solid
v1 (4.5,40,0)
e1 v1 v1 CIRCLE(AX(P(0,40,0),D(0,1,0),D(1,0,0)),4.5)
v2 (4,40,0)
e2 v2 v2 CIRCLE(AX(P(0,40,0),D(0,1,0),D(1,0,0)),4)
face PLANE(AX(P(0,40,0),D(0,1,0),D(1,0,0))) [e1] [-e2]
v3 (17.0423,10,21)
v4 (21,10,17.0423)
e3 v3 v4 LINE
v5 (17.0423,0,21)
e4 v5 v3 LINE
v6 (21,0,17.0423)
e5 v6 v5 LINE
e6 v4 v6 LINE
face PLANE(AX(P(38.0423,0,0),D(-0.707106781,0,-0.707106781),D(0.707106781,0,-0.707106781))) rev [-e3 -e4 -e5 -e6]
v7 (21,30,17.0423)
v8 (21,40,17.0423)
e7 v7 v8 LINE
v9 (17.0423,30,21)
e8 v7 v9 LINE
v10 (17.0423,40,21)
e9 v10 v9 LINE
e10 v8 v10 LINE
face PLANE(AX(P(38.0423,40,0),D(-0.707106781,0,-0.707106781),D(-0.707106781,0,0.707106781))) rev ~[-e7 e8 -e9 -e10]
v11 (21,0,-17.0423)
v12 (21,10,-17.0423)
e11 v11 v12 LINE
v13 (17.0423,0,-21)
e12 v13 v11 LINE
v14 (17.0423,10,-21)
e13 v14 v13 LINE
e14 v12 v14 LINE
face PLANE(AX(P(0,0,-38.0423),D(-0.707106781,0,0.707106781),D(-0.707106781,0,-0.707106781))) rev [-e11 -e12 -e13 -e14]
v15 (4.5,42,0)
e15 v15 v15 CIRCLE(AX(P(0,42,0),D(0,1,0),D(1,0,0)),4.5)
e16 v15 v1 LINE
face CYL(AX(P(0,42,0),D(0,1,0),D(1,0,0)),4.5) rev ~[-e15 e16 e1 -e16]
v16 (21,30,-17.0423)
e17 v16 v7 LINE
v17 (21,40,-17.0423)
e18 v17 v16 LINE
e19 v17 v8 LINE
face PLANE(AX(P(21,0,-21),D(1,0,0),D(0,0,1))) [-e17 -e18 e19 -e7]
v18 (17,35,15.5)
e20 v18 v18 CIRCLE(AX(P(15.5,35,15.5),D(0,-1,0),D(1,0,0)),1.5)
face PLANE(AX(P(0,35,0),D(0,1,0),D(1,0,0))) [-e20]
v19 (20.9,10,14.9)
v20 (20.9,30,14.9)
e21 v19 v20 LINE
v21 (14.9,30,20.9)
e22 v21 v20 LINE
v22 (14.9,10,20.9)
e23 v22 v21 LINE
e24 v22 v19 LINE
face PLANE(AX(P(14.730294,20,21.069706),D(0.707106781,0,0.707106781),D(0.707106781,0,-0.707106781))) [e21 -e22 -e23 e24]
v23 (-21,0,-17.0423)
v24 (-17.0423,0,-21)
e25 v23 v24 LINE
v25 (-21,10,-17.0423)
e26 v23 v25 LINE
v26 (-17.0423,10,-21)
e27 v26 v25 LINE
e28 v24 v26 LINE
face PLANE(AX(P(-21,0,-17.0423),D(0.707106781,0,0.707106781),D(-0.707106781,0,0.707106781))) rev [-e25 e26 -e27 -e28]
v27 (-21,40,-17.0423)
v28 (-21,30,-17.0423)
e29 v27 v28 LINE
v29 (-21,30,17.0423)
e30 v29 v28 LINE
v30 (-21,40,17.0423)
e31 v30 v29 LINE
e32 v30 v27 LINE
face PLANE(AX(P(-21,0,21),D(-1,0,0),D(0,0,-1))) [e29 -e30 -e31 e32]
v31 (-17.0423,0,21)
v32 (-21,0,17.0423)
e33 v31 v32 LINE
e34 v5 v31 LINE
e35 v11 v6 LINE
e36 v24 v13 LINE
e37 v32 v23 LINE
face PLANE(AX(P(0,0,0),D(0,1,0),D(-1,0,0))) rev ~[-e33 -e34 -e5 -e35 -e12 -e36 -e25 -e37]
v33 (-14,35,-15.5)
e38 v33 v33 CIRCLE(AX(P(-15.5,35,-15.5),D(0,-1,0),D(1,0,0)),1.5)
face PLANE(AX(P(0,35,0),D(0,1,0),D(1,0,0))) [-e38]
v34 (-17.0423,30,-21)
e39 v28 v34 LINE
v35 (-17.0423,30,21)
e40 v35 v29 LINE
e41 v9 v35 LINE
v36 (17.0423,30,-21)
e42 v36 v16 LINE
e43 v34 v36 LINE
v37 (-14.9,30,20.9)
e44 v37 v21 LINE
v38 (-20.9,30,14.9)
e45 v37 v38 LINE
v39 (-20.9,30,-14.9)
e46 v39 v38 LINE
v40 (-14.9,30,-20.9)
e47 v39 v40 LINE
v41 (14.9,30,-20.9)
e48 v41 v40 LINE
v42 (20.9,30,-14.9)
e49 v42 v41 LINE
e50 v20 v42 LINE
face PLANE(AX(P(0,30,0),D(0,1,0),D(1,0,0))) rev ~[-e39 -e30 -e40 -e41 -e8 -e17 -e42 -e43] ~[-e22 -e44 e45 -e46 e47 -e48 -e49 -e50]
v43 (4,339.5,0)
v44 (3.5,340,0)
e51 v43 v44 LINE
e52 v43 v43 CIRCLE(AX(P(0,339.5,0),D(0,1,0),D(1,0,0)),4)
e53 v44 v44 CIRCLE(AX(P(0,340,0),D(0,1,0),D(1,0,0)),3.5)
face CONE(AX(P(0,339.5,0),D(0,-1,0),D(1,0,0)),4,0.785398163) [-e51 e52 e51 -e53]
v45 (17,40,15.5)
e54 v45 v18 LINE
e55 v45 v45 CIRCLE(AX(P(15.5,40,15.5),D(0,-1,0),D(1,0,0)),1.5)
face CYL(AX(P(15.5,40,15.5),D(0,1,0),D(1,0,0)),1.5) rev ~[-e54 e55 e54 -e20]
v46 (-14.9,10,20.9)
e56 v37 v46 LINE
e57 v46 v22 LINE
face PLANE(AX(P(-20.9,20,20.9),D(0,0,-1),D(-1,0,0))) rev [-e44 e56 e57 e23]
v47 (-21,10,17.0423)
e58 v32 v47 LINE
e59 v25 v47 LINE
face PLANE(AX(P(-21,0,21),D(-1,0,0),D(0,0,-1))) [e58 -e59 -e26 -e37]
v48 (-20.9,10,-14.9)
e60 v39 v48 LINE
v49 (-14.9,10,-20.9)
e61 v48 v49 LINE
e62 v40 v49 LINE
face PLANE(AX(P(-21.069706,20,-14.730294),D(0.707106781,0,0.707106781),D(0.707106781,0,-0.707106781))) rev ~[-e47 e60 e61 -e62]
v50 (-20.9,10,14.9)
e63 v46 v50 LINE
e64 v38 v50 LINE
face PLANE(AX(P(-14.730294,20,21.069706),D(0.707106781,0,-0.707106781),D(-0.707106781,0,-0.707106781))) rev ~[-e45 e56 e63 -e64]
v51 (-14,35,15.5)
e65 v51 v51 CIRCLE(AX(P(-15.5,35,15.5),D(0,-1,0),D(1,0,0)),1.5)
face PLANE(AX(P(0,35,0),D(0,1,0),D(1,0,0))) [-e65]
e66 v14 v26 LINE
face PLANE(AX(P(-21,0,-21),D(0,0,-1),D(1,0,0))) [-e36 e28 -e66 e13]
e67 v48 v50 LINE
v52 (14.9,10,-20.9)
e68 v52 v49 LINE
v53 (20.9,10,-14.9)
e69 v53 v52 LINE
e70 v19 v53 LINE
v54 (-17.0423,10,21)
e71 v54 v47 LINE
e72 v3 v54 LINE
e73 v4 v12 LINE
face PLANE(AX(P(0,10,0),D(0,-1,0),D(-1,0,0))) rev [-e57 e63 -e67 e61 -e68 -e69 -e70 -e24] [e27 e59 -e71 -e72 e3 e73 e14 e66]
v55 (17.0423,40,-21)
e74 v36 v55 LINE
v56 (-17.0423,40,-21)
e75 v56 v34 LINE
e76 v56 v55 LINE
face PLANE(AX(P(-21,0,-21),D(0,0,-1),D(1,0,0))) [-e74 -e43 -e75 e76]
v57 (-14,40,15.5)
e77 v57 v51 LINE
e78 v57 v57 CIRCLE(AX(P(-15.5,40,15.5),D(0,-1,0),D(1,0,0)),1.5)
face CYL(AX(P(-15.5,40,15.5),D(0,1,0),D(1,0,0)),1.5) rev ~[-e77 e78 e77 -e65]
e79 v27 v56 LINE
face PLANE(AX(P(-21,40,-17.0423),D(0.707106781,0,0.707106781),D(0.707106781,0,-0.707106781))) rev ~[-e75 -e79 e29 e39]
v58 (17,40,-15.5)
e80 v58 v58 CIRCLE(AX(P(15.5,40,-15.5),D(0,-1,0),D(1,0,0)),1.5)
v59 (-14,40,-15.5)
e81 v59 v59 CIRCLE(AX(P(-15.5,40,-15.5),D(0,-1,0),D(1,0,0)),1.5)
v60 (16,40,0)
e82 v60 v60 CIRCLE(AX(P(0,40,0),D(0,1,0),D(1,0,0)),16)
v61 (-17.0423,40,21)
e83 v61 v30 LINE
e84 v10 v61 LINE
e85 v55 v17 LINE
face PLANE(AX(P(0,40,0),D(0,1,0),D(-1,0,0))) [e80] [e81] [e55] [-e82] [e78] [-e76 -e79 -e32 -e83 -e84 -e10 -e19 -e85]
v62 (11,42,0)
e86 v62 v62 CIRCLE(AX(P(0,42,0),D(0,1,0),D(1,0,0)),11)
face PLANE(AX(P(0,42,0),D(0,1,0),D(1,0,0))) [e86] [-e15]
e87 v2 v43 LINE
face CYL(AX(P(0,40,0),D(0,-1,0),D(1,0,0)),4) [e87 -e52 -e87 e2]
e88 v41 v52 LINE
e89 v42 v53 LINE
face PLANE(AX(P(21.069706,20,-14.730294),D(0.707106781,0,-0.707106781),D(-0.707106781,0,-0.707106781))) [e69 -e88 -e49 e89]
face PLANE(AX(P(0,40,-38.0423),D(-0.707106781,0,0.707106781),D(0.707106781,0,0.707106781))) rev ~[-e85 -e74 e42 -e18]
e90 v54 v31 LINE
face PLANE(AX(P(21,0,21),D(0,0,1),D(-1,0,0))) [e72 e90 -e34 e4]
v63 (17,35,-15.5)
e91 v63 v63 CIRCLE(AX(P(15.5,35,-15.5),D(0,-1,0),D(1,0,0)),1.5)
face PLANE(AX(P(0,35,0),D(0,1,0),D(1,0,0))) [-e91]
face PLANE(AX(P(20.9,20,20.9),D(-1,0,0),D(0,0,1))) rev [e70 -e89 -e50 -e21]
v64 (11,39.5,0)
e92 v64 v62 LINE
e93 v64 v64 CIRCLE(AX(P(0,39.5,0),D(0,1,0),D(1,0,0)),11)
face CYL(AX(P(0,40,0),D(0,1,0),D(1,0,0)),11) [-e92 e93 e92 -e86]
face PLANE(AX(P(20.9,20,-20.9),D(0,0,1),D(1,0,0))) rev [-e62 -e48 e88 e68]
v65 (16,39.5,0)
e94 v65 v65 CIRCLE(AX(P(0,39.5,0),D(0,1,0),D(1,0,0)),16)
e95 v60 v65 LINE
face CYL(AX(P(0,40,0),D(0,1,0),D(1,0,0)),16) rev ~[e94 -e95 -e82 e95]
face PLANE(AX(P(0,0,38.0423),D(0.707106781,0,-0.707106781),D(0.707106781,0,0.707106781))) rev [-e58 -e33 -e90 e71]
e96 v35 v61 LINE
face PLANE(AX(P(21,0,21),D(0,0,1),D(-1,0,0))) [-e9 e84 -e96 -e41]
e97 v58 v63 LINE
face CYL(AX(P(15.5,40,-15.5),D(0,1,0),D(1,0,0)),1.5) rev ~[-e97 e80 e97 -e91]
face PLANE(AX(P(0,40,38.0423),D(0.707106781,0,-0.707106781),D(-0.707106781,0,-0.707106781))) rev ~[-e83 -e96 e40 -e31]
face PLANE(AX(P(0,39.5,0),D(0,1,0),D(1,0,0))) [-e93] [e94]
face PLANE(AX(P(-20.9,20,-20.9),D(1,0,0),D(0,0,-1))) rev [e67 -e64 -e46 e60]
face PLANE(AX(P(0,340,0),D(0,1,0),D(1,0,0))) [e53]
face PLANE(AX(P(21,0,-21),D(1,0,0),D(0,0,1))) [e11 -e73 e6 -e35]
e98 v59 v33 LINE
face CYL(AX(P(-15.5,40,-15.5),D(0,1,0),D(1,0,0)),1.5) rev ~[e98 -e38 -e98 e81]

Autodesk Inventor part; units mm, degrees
ref_plane "YZ Plane" through (0, 0, 0) normal (1, 0, 0) x (0, 1, 0)
ref_plane "XZ Plane" through (0, 0, 0) normal (0, 1, 0) x (-1, 0, 0)
sketch "Sketch1" plane through (0, 0, 0) normal (0, 1, 0) x (-1, 0, 0)
  line L0 (-21, 21) -> (21, 21)
  line L1 (21, 21) -> (21, -21)
  line L2 (21, -21) -> (-21, -21)
  line L3 (-21, -21) -> (-21, 21)
  line L4 (-21, 21) -> (21, -21) construction
  line L5 (21, 21) -> (-21, -21) construction
  point P0 (0, 0)
  dimension "d0" = 42
  dimension "d1" = 42
extrude "Extrusion1" add sketch "Sketch1" along normal blind 40
ref_plane "Work Plane1" through (0, 20, 0) normal (0, 1, 0) x (1, 0, 0)
sketch "Sketch2" plane through (0, 40, 0) normal (0, 1, 0) x (1, 0, 0)
  line L0 (0, -38.0423) -> (-38.0423, 0)
  line L1 (-38.0423, 0) -> (0, 38.0423)
  line L2 (0, 38.0423) -> (38.0423, 0)
  line L3 (38.0423, 0) -> (0, -38.0423)
  line L4 (0, -38.0423) -> (0, 38.0423) construction
  line L5 (-38.0423, 0) -> (38.0423, 0) construction
  line L6 (-21, 21) -> (-21, -21) projected
  circle A0 centre (0, 0) radius 250
  dimension "d4" = 53.8
  dimension "d5" = 53.8
  dimension "d6" = 500
extrude "Extrusion2" cut sketch "Sketch2" against normal blind 10
sketch "Sketch3" plane through (0, 20, 0) normal (0, 1, 0) x (1, 0, 0)
  line L0 (-20.9, -20.9) -> (20.9, -20.9)
  line L1 (20.9, -20.9) -> (20.9, 20.9)
  line L2 (20.9, 20.9) -> (-20.9, 20.9)
  line L3 (-20.9, 20.9) -> (-20.9, -20.9)
  line L4 (-21, -21) -> (-21, -17.0423) projected
  line L5 (21, -21) -> (17.0423, -21) projected
  line L6 (21, 21) -> (21, 17.0423) projected
  line L7 (-21, 21) -> (-17.0423, 21) projected
  circle A0 centre (0, 0) radius 200
  dimension "d9" = 0.1
  dimension "d10" = 0.1
  dimension "d11" = 0.1
  dimension "d12" = 0.1
  dimension "d13" = 400
extrude "Extrusion3" cut sketch "Sketch3" along normal up to surface (10 mm away)
chamfer "Chamfer1" distance 6 angle 45 4 edges at (20.9, 25, 20.9) (20.9, 25, -20.9) (-20.9, 25, 20.9) (-20.9, 25, -20.9)
mirror "Mirror1" about plane through (0, 20, 0) normal (0, 1, 0) of "Extrusion3", "Extrusion2", "Chamfer1"
sketch "Sketch4" plane through (0, 40, 0) normal (0, 1, 0) x (1, 0, 0)
  circle A0 centre (0, 0) radius 11
  dimension "d19" = 22
extrude "Extrusion4" add sketch "Sketch4" along normal blind 2
sketch "Sketch5" plane through (0, 40, 0) normal (0, 1, 0) x (1, 0, 0)
  circle A0 centre (0, 0) radius 11 projected
  line L0 (17.0423, -21) -> (21, -17.0423) projected
  line L1 (21, -17.0423) -> (21, 17.0423) projected
  line L2 (21, 17.0423) -> (17.0423, 21) projected
  line L3 (17.0423, 21) -> (-17.0423, 21) projected
  line L4 (-17.0423, 21) -> (-21, 17.0423) projected
  line L5 (-21, 17.0423) -> (-21, -17.0423) projected
  line L6 (-21, -17.0423) -> (-17.0423, -21) projected
  line L7 (-17.0423, -21) -> (17.0423, -21) projected
  circle A1 centre (0, 0) radius 16
  dimension "d22" = 32
extrude "Extrusion5" cut sketch "Sketch5" against normal blind 0.5 contours A1
sketch "Sketch6" plane through (0, 42, 0) normal (0, 1, 0) x (1, 0, 0)
  circle A0 centre (0, 0) radius 4.5
  dimension "d25" = 9
extrude "Extrusion6" cut sketch "Sketch6" against normal blind 2
sketch "Sketch7" plane through (0, 40, 0) normal (0, 1, 0) x (1, 0, 0)
  circle A0 centre (0, 0) radius 4
  dimension "d28" = 8
extrude "Extrusion7" add sketch "Sketch7" along normal blind 300
thread "Thread1" size "TR8x1.5" class "7e" standard "ISO Metric Trapezoidal Threads" full length
chamfer "Chamfer2" distance 0.5 angle 45 1 edges at (-4, 340, 0)
sketch "Sketch8" plane through (0, 40, 0) normal (0, 1, 0) x (1, 0, 0)
  circle A0 centre (0, 0) radius 16 construction
  line L0 (17.0423, -21) -> (21, -17.0423) construction
  line L1 (21, -17.0423) -> (21, 17.0423) construction
  line L2 (21, 17.0423) -> (17.0423, 21) construction
  line L3 (17.0423, 21) -> (-17.0423, 21) construction
  line L4 (-17.0423, 21) -> (-21, 17.0423) construction
  line L5 (-21, 17.0423) -> (-21, -17.0423) construction
  line L6 (-21, -17.0423) -> (-17.0423, -21) construction
  line L7 (-17.0423, -21) -> (17.0423, -21) construction
  line L8 (-15.5, -15.5) -> (15.5, -15.5) construction
  line L9 (15.5, -15.5) -> (15.5, 15.5) construction
  line L10 (15.5, 15.5) -> (-15.5, 15.5) construction
  line L11 (-15.5, 15.5) -> (-15.5, -15.5) construction
  line L12 (-15.5, -15.5) -> (15.5, 15.5) construction
  line L13 (15.5, -15.5) -> (-15.5, 15.5) construction
  circle A1 centre (-15.5, 15.5) radius 1.5
  circle A2 centre (15.5, 15.5) radius 1.5
  circle A3 centre (15.5, -15.5) radius 1.5
  circle A4 centre (-15.5, -15.5) radius 1.5
  dimension "d36" = 31
  dimension "d37" = 31
  dimension "d38" = 3
  dimension "d39" = 3
  dimension "d40" = 3
  dimension "d41" = 3
extrude "Extrusion8" cut sketch "Sketch8" against normal blind 5
thread "Thread2" size "M3x0.5" class "6H" standard "ANSI Metric M Profile" full length
pattern_circular "Circular Pattern1" count 4 over 360 about axis through (0, 40, 0) along (0, 1, 0) of "Extrusion8"
equation "\"d9\" = d10"
equation "\"d11\" = d10"
equation "\"d12\" = d10"
properties part number "linear_stepper_350mm"
